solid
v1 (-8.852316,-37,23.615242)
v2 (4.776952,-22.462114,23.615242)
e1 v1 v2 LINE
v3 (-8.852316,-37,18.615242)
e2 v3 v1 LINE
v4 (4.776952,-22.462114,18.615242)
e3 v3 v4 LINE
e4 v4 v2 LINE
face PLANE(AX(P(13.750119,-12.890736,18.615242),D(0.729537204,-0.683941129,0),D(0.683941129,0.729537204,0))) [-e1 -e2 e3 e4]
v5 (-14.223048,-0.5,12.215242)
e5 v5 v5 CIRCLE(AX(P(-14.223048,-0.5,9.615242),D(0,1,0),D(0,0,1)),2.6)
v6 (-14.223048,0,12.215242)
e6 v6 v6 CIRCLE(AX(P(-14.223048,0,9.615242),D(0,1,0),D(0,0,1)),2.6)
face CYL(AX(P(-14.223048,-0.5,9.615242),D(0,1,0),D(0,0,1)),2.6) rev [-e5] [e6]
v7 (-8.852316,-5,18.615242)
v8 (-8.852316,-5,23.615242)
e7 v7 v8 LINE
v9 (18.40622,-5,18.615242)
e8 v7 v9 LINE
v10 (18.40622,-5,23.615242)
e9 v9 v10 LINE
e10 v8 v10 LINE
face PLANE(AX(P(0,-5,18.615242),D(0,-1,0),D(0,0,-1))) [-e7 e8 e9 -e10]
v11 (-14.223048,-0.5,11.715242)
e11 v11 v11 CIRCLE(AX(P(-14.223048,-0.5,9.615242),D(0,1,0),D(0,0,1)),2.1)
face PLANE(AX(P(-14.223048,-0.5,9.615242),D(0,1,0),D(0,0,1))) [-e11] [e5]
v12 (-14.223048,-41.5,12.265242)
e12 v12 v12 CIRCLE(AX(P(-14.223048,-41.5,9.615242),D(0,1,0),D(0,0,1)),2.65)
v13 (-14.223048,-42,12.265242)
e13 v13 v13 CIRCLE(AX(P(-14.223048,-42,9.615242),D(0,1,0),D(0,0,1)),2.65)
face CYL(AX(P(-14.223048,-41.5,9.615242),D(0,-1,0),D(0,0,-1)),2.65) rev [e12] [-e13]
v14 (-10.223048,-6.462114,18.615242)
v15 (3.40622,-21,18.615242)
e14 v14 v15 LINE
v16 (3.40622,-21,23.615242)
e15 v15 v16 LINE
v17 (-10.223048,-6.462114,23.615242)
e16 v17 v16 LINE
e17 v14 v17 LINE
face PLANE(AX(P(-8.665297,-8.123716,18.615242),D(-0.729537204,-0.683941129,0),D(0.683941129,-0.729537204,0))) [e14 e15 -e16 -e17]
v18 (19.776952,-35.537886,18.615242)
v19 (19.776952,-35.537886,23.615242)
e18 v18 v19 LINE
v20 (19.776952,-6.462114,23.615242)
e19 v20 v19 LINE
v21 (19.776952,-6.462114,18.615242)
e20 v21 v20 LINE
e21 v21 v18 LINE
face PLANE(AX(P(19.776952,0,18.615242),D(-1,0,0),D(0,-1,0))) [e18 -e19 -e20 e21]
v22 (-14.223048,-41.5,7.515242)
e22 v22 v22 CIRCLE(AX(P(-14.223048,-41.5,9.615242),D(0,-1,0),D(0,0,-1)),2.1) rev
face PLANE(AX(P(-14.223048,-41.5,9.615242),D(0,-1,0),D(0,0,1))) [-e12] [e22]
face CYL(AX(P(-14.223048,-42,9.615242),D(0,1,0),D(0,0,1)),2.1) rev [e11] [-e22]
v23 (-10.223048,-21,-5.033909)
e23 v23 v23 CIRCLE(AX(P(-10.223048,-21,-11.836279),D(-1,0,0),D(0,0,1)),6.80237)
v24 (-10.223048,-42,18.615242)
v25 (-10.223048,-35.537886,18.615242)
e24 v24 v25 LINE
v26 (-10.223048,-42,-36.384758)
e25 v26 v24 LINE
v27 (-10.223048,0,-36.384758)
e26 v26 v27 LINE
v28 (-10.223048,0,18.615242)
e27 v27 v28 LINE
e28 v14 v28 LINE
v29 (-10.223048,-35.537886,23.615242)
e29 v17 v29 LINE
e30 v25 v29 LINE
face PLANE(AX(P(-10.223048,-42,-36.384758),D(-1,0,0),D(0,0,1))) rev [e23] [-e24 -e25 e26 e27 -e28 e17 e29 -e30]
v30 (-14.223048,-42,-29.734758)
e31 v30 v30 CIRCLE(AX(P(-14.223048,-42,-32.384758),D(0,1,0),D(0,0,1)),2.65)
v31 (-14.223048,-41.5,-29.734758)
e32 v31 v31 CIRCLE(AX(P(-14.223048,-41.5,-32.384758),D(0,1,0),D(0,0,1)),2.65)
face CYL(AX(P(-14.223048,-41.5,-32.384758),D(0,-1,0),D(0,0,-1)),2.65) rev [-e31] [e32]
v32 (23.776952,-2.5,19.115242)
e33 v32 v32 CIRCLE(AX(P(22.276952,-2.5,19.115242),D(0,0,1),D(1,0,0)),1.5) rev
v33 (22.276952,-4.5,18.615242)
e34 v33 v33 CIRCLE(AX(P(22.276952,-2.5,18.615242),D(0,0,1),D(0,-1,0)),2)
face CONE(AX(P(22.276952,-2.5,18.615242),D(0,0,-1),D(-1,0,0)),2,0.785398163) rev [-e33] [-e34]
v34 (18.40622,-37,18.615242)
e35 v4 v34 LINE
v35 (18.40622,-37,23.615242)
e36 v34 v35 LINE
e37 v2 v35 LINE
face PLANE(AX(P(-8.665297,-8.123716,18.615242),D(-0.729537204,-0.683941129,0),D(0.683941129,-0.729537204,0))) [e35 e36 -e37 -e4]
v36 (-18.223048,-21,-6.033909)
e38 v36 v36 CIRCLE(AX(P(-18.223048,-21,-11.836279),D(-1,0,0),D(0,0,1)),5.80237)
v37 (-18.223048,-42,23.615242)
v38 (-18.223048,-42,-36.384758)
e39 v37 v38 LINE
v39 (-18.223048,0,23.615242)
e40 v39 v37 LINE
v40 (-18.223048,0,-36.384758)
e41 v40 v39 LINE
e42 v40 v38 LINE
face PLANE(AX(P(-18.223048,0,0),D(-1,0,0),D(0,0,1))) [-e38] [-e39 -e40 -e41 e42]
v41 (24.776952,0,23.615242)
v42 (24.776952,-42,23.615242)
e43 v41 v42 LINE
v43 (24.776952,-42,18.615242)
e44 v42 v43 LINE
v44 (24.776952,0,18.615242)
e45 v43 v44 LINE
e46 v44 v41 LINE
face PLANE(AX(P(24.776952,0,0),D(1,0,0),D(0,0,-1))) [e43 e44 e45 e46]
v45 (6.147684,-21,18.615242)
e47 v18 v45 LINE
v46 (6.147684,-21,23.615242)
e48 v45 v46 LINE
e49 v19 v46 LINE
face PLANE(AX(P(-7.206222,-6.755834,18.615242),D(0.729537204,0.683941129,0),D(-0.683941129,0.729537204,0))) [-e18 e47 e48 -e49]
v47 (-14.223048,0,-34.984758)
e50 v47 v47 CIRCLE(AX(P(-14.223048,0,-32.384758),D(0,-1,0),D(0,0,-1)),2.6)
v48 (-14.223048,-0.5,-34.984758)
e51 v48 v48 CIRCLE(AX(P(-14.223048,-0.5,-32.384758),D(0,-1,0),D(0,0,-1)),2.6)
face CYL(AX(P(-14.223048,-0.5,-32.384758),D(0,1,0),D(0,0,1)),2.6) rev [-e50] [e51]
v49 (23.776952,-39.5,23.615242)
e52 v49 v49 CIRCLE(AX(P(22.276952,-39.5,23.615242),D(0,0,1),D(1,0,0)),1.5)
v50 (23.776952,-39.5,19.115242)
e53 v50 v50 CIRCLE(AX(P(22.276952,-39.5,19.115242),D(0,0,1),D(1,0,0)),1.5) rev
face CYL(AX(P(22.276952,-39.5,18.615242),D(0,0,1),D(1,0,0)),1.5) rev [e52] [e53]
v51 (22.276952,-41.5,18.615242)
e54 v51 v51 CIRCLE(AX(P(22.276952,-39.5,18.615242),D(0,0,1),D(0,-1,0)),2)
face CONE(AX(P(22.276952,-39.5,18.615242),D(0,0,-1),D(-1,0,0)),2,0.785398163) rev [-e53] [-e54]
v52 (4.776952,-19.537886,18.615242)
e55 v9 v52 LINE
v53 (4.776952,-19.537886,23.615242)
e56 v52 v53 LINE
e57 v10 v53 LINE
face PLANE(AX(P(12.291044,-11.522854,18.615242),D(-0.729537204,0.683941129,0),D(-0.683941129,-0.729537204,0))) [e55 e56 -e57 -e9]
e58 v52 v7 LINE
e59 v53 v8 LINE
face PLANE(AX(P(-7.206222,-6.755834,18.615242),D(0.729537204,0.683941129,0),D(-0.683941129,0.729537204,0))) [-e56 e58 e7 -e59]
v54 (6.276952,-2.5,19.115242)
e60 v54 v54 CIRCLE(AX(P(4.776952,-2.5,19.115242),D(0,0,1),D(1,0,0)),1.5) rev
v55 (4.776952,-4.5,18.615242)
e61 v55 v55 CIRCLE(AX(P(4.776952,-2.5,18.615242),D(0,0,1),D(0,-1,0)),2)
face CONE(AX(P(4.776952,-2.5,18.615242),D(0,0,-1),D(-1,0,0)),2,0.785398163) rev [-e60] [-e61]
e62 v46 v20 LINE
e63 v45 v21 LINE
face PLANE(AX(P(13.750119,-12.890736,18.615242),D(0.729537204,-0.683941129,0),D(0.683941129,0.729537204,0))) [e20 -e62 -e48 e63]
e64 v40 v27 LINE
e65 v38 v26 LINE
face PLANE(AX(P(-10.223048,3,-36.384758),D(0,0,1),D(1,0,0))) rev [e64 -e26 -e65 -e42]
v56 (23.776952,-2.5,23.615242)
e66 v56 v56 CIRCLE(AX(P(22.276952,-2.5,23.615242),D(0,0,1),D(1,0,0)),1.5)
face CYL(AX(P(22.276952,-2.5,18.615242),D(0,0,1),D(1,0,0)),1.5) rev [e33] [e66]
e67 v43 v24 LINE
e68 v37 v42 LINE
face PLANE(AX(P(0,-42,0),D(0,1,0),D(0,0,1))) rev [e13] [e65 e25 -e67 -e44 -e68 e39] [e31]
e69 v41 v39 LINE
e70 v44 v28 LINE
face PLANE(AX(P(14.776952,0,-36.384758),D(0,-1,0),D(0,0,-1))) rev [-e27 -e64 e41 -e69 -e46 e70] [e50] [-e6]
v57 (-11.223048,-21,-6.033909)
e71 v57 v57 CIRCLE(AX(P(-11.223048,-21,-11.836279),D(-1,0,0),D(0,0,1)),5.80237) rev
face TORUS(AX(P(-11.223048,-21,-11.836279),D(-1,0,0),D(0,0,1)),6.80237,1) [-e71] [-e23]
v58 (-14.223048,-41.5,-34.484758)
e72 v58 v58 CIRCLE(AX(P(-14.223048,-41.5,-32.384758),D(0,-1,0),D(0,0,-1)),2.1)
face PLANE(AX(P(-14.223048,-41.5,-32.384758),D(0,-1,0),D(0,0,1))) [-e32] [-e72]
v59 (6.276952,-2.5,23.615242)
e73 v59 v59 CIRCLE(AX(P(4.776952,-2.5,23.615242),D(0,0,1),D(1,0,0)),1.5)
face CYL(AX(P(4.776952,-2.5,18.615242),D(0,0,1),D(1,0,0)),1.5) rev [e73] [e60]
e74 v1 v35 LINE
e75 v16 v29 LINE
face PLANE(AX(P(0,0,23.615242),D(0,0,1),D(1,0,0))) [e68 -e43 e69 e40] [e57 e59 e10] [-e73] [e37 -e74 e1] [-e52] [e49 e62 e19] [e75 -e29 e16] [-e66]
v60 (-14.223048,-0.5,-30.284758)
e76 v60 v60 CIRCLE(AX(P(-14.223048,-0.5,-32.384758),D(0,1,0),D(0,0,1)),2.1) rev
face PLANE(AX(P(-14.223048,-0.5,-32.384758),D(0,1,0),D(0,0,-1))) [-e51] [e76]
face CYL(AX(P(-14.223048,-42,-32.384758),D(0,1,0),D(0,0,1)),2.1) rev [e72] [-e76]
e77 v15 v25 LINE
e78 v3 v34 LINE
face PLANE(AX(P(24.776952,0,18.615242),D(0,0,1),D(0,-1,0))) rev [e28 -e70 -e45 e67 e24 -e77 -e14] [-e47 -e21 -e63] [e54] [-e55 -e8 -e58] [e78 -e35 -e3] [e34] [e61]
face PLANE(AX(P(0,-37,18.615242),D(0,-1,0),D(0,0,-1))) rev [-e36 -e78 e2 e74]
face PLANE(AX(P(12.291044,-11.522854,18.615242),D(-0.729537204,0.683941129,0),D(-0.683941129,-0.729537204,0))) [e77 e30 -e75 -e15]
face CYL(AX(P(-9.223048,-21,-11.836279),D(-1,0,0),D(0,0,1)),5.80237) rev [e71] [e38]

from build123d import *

# Parameters (mm, degrees)
SKETCH1_W           = 25
SKETCH1_H           = 50
SKETCH1_R           = 3.4
BOSS_EXTRUDE1_DEPTH = 3
SKETCH2_W           = 50
SKETCH2_H           = 3
BOSS_EXTRUDE2_DEPTH = 8
SKETCH3_W           = 8
SKETCH3_H           = 50
BOSS_EXTRUDE3_DEPTH = 42
SKETCH4_R           = 2.65
CUT_EXTRUDE1_DEPTH  = 0.5
SKETCH5_R           = 5.802370205
CUT_EXTRUDE2_DEPTH  = 9
FILLET2_R           = 1
SKETCH6_R           = 12.6
BOSS_EXTRUDE4_DEPTH = 2
FILLET4_R           = 1
SKETCH8_R           = 1.589780168
SKETCH8_R_2         = 1.777428262
CUT_EXTRUDE3_DEPTH  = 10
SKETCH9_W           = 49.021678163
SKETCH9_H           = 20.976854622
CUT_EXTRUDE4_DEPTH  = 68.79439129
SKETCH11_R          = 2.1
CUT_EXTRUDE5_DEPTH  = 59.480168703
SKETCH14_R          = 2.6
CUT_EXTRUDE6_DEPTH  = 0.5
SKETCH15_W          = 8
SKETCH15_H          = 42
BOSS_EXTRUDE5_DEPTH = 10
SKETCH17_W          = 5
SKETCH17_H          = 42
BOSS_EXTRUDE6_DEPTH = 35
CUT_EXTRUDE7_DEPTH  = 5
SKETCH22_R          = 1.5
CUT_EXTRUDE8_DEPTH  = 5
CHAMFER1_SIZE       = 0.5


with BuildPart() as part:
    # Sketch1 → Boss-Extrude1 (new body)
    with BuildSketch(Plane(origin=(0, 0, 0), x_dir=(1, 0, 0), z_dir=(0, 1, 0))):
        with Locations((2.276951673, 11.384758364)):
            Rectangle(SKETCH1_W, SKETCH1_H)
        with Locations(Location((1.276951673, 11.384758364, 0), (0, 0, 270))):
            Circle(SKETCH1_R, mode=Mode.SUBTRACT)
    extrude(amount=BOSS_EXTRUDE1_DEPTH)

    # Sketch2 → Boss-Extrude2 (add)
    with BuildSketch(Plane.ZY.offset(10.223048327)):
        with Locations((-11.384758364, 1.5)):
            Rectangle(SKETCH2_W, SKETCH2_H)
    extrude(amount=BOSS_EXTRUDE2_DEPTH)

    # Sketch3 → Boss-Extrude3 (add)
    with BuildSketch(Plane.XZ):
        with Locations((-14.223048327, -11.384758364)):
            Rectangle(SKETCH3_W, SKETCH3_H)
    extrude(amount=BOSS_EXTRUDE3_DEPTH)

    # Sketch4 → Cut-Extrude1 (cut)
    with BuildSketch(Plane(origin=(0, 3, 0), x_dir=(1, 0, 0), z_dir=(0, 1, 0))):
        with Locations(Location((-14.223048327, 32.384758364, 0), (0, 0, 270))):
            Circle(SKETCH4_R)
        with Locations(Location((-14.223048327, -9.615241636, 0), (0, 0, 270))):
            Circle(SKETCH4_R)
    cut_extrude1 = extrude(amount=-CUT_EXTRUDE1_DEPTH, mode=Mode.SUBTRACT)

    # Mirror1: Cut-Extrude1 across plane
    add(cut_extrude1.mirror(Plane.ZX.offset(-19.5)), mode=Mode.SUBTRACT)

    # Sketch5 → Cut-Extrude2 (cut)
    with BuildSketch(Plane.ZY.offset(18.223048327)):
        with Locations((-11.836279124, -21)):
            Circle(SKETCH5_R)
    extrude(amount=-CUT_EXTRUDE2_DEPTH, mode=Mode.SUBTRACT)

    # Fillet2
    fillet2_edges = [part.edges().sort_by_distance(p)[0] for p in [
        (-10.223048327, -21, -17.638649329),
    ]]
    fillet(fillet2_edges, radius=FILLET2_R)

    # Mirror2: Cut-Extrude1 across plane
    add(cut_extrude1.mirror(Plane.ZY.offset(1.723048327)), mode=Mode.SUBTRACT)

    # Sketch6 → Boss-Extrude4 (add)
    with BuildSketch(Plane(origin=(0, 3, 0), x_dir=(1, 0, 0), z_dir=(0, 1, 0))):
        with BuildLine():
            Line((14.776951673, 5.825082115), (14.776951673, 16.944434614))
            ThreePointArc((14.776951673, 16.944434614), (-13.323048327, 11.384758364), (14.776951673, 5.825082115))
        make_face()
        with Locations(Location((1.276951673, 11.384758364, 0), (0, 0, 270))):
            Circle(SKETCH6_R, mode=Mode.SUBTRACT)
    extrude(amount=BOSS_EXTRUDE4_DEPTH)

    # Fillet4
    # the kernel refuses this fillet: 1 mm, written as the material it takes off along each edge
    with BuildSketch(Plane(origin=(14.776951673, 5, -3.325082115), x_dir=(0, -1, 0), z_dir=(0, 0, -1))) as fillet4_piece_1:
        with BuildLine():
            CenterArc((FILLET4_R, FILLET4_R), FILLET4_R, 180, 90)
            Line((0, FILLET4_R), (0, 0))
            Line((0, 0), (FILLET4_R, 0))
        make_face()
    extrude(amount=16.119352499, mode=Mode.SUBTRACT)

    # Sketch8 → Cut-Extrude3 (cut)
    with BuildSketch(Plane(origin=(0, 3, 0), x_dir=(1, 0, 0), z_dir=(0, 1, 0))):
        with Locations(Location((1.276951673, 19.884758364, 0), (0, 0, 270))):
            Circle(SKETCH8_R)
        with Locations(Location((1.276951673, 2.884758364, 0), (0, 0, 270))):
            Circle(SKETCH8_R_2)
    extrude(amount=-CUT_EXTRUDE3_DEPTH, mode=Mode.SUBTRACT)

    # Sketch9 → Cut-Extrude4 (cut, through all)
    with BuildSketch(Plane.XY.offset(13.615241636)):
        with Locations((-9.733887409, 10.488427311)):
            Rectangle(SKETCH9_W, SKETCH9_H)
    extrude(amount=-CUT_EXTRUDE4_DEPTH, mode=Mode.SUBTRACT)

    # Sketch11 → Cut-Extrude5 (cut, through all)
    with BuildSketch(Plane(origin=(0, 0, 0), x_dir=(1, 0, 0), z_dir=(0, 1, 0))):
        with Locations(Location((-14.223048327, 32.384758364, 0), (0, 0, 270))):
            Circle(SKETCH11_R)
    cut_extrude5 = extrude(amount=-CUT_EXTRUDE5_DEPTH, mode=Mode.SUBTRACT)

    # Mirror3: Cut-Extrude5 across plane
    add(cut_extrude5.mirror(Plane.XY.offset(-11.384758364)), mode=Mode.SUBTRACT)

    # Sketch14 → Cut-Extrude6 (cut)
    with BuildSketch(Plane(origin=(0, 0, 0), x_dir=(1, 0, 0), z_dir=(0, 1, 0))):
        with Locations(Location((-14.223048327, -9.615241636, 0), (0, 0, 270))):
            Circle(SKETCH14_R)
    cut_extrude6 = extrude(amount=-CUT_EXTRUDE6_DEPTH, mode=Mode.SUBTRACT)

    # Mirror4: Cut-Extrude6 across plane
    add(cut_extrude6.mirror(Plane.XY.offset(-11.384758364)), mode=Mode.SUBTRACT)

    # Sketch15 → Boss-Extrude5 (add)
    with BuildSketch(Plane.XY.offset(13.615241636)):
        with Locations((-14.223048327, -21)):
            Rectangle(SKETCH15_W, SKETCH15_H)
    extrude(amount=BOSS_EXTRUDE5_DEPTH)

    # Sketch17 → Boss-Extrude6 (add)
    with BuildSketch(Plane(origin=(-10.223048327, 0, 0), x_dir=(0, 0, -1), z_dir=(1, 0, 0))):
        with Locations((-21.115241636, -21)):
            Rectangle(SKETCH17_W, SKETCH17_H)
    extrude(amount=BOSS_EXTRUDE6_DEPTH)

    # Sketch21 → Cut-Extrude7 (cut)
    with BuildSketch(Plane.XY.offset(23.615241636)):
        Polygon((3.40621966, -21), (-10.223048327, -6.462114147), (-10.223048327, -35.537885853), align=None)
        Polygon((18.40621966, -5), (-8.852316315, -5), (4.776951673, -19.537885853), align=None)
        Polygon((19.776951673, -35.537885853), (19.776951673, -6.462114147), (6.147683685, -21), align=None)
        Polygon((4.776951673, -22.462114147), (-8.852316315, -37), (18.40621966, -37), align=None)
    extrude(amount=-CUT_EXTRUDE7_DEPTH, mode=Mode.SUBTRACT)

    # Sketch22 → Cut-Extrude8 (cut)
    with BuildSketch(Plane.XY.offset(23.615241636)):
        with Locations((22.276951673, -2.5)):
            Circle(SKETCH22_R)
        with Locations((22.276951673, -39.5)):
            Circle(SKETCH22_R)
        with Locations((4.776951673, -2.5)):
            Circle(SKETCH22_R)
    extrude(amount=-CUT_EXTRUDE8_DEPTH, mode=Mode.SUBTRACT)

    # Chamfer1
    chamfer1_edges = [part.edges().sort_by_distance(p)[0] for p in [
        (3.276951673, -2.5, 18.615241636),
        (20.776951673, -39.5, 18.615241636),
        (20.776951673, -2.5, 18.615241636),
    ]]
    chamfer(chamfer1_edges, length=CHAMFER1_SIZE)


solid = part.part
